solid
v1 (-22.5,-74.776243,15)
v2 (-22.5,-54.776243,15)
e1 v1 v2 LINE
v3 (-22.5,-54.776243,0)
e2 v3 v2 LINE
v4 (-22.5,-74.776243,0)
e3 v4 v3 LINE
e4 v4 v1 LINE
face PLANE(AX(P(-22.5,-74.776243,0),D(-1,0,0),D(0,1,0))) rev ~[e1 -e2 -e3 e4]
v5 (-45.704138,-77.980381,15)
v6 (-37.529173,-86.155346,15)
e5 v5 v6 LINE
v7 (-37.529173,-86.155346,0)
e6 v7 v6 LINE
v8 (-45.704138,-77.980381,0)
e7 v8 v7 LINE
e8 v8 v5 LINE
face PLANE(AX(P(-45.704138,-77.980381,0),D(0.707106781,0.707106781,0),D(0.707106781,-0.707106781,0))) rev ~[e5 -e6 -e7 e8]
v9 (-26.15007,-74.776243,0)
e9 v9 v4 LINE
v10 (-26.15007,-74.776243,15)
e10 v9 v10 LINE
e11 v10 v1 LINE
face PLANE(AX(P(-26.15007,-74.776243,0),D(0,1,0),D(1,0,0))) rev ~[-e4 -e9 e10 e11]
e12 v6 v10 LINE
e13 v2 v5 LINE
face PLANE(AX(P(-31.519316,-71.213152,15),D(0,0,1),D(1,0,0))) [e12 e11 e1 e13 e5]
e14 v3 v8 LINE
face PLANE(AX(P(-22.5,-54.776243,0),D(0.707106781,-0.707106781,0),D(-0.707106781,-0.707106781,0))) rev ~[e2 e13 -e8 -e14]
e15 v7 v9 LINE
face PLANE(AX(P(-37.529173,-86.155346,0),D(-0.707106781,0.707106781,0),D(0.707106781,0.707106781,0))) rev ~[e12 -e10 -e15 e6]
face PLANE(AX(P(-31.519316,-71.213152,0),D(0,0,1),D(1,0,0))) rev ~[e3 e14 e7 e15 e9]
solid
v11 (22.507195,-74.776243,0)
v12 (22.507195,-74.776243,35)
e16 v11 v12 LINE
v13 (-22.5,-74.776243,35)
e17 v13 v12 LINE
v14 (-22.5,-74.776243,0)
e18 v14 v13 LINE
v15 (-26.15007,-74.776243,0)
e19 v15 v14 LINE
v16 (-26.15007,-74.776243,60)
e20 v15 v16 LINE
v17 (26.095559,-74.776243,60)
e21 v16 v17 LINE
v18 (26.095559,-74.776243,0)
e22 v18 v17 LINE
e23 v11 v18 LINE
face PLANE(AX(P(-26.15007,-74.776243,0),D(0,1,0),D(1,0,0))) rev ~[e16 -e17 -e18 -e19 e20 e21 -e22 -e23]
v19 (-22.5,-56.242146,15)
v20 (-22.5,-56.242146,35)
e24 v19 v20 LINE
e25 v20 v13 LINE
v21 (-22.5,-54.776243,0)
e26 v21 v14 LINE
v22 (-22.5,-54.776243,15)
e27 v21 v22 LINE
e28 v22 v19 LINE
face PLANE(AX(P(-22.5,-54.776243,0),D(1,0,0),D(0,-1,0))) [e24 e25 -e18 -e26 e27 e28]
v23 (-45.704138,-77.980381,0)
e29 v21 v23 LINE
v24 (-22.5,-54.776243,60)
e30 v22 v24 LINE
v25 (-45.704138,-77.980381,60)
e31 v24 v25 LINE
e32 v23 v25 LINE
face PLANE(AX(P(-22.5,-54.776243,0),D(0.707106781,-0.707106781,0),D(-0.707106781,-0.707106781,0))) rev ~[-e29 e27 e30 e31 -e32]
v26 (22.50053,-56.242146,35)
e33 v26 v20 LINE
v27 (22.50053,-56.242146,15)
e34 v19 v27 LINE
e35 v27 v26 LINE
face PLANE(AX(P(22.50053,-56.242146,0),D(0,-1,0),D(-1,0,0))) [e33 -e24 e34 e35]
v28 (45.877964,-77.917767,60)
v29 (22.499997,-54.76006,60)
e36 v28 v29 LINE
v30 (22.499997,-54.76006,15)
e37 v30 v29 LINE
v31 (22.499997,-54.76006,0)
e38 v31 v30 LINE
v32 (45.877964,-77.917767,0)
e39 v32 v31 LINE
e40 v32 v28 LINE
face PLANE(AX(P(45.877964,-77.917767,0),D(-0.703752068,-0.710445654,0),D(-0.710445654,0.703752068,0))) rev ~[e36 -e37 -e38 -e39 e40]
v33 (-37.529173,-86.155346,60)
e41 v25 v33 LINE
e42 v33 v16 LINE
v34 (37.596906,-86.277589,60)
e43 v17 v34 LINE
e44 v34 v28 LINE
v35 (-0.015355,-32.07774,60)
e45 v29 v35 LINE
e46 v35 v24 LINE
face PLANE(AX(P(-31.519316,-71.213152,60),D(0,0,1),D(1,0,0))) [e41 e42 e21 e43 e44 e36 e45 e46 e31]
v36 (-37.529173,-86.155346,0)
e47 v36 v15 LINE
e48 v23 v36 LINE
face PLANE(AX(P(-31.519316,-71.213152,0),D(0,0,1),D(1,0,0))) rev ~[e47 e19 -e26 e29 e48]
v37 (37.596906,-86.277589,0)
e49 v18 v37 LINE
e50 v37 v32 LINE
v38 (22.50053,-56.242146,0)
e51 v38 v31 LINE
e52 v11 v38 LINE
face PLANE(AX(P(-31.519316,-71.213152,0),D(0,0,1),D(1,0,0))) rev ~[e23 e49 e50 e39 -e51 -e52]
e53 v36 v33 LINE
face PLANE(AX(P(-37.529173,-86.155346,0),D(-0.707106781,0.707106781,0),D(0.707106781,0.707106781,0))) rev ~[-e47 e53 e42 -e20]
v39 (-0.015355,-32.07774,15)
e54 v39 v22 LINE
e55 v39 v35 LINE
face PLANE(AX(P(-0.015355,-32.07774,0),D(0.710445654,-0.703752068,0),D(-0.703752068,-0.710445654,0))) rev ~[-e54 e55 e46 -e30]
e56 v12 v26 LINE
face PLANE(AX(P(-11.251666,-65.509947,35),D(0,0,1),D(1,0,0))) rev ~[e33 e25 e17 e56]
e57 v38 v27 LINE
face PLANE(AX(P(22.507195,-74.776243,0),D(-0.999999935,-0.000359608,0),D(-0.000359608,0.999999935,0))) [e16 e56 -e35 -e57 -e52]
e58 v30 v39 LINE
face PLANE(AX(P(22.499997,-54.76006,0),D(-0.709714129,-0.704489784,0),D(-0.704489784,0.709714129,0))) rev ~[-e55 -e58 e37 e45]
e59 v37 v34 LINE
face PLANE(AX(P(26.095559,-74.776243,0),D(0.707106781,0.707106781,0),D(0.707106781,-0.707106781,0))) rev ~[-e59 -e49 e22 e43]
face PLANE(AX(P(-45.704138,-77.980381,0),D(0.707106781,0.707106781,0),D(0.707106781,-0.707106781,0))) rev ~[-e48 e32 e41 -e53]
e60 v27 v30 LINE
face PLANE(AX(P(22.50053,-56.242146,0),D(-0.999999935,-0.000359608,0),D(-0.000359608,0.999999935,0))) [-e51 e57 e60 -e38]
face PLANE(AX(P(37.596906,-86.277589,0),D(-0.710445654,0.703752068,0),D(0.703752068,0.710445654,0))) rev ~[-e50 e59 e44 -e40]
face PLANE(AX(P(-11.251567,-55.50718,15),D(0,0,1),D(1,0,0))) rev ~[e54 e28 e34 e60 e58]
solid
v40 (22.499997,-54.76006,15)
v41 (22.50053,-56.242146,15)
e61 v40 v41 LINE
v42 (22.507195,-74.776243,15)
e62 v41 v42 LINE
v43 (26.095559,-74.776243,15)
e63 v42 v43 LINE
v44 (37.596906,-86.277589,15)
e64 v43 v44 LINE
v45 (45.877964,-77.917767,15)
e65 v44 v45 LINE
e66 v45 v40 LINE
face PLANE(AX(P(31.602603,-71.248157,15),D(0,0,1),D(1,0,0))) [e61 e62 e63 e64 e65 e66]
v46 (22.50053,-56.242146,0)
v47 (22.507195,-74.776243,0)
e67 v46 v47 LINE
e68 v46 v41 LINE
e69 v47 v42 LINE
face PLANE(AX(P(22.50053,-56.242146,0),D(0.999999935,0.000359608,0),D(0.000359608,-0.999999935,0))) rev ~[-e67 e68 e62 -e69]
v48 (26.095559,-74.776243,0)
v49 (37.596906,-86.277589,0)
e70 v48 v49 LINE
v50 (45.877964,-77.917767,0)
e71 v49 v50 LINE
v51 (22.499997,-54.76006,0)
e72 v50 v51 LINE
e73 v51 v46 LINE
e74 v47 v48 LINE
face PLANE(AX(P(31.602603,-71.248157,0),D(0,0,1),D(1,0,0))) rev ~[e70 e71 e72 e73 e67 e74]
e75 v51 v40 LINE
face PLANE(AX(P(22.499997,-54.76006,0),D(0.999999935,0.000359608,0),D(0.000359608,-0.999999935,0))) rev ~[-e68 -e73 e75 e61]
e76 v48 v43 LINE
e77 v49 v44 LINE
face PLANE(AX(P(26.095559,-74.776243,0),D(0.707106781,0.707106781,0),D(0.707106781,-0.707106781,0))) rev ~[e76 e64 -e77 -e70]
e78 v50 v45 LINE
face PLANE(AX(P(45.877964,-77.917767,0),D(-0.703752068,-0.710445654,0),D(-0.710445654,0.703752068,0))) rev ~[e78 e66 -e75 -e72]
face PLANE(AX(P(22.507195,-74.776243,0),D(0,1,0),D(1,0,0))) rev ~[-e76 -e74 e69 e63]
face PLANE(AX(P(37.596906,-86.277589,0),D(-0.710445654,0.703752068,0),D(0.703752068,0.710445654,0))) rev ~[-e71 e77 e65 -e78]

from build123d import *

# Parameters (mm, degrees)
F1_DEPTH = 15
F3_DEPTH = 60
F4_DEPTH = 35
F5_DEPTH = 15


# Not quite as in the source:
# - a feature of the source that left no trace in its solid (it failed there, or was rolled back) is left out


with BuildPart() as f1:
    # F0 (on Top) → F1 (new body)
    with BuildSketch(Plane.XY):
        Polygon((-45.7041380099, -77.9803808107), (-37.5291732437, -86.155345577), (-26.1500704675, -74.7762428008), (-22.5, -74.7762428008), (-22.5, -56.2421455979), (-22.5, -54.7762428008), align=None)
    extrude(amount=F1_DEPTH)


with BuildPart() as f1b:
    # F0 (on Top) → F1, piece 2 (new body)
    with BuildSketch(Plane.XY):
        Polygon((26.0955594839, -74.7762428008), (37.5969056221, -86.277588939), (45.8779636159, -77.9177674474), (22.4999970904, -54.7600604596), (22.5005300594, -56.2421455979), (22.5071950618, -74.7762428008), align=None)
    extrude(amount=F1_DEPTH)


with BuildPart() as f3:
    # F0 (on Top) → F3 (new body)
    with BuildSketch(Plane.XY):
        Polygon((-45.7041380099, -77.9803808107), (-37.5291732437, -86.155345577), (-26.1500704675, -74.7762428008), (-22.5, -74.7762428008), (-22.5, -56.2421455979), (-22.5, -54.7762428008), align=None)
        Polygon((-22.5, -56.2421455979), (-22.5, -74.7762428008), (0, -74.7762428008), (-0.0066650023, -56.2421455979), align=None)
        Polygon((0, -74.7762428008), (22.5071950618, -74.7762428008), (22.5005300594, -56.2421455979), (-0.0066650023, -56.2421455979), align=None)
        Polygon((26.0955594839, -74.7762428008), (37.5969056221, -86.277588939), (45.8779636159, -77.9177674474), (22.4999970904, -54.7600604596), (22.5005300594, -56.2421455979), (22.5071950618, -74.7762428008), align=None)
        Polygon((-0.0071950608, -54.7681542171), (-22.5, -54.7762428008), (-22.5, -56.2421455979), (-0.0066650023, -56.2421455979), align=None)
        Polygon((22.5005300594, -56.2421455979), (22.4999970904, -54.7600604596), (-0.0071950608, -54.7681542171), (-0.0066650023, -56.2421455979), align=None)
        Polygon((-0.0153547065, -32.0777396508), (-22.5, -54.7762428008), (-0.0071950608, -54.7681542171), align=None)
        Polygon((-0.0071950608, -54.7681542171), (22.4999970904, -54.7600604596), (-0.0153547065, -32.0777396508), align=None)
    extrude(amount=F3_DEPTH)

    # F0 (on Top) → F4 (cut)
    with BuildSketch(Plane.XY):
        Polygon((-22.5, -56.2421455979), (-22.5, -74.7762428008), (0, -74.7762428008), (-0.0066650023, -56.2421455979), align=None)
        Polygon((0, -74.7762428008), (22.5071950618, -74.7762428008), (22.5005300594, -56.2421455979), (-0.0066650023, -56.2421455979), align=None)
    extrude(amount=F4_DEPTH, mode=Mode.SUBTRACT)

    # F0 (on Top) → F5 (cut)
    with BuildSketch(Plane.XY):
        Polygon((-0.0071950608, -54.7681542171), (-22.5, -54.7762428008), (-22.5, -56.2421455979), (-0.0066650023, -56.2421455979), align=None)
        Polygon((22.5005300594, -56.2421455979), (22.4999970904, -54.7600604596), (-0.0071950608, -54.7681542171), (-0.0066650023, -56.2421455979), align=None)
        Polygon((-0.0071950608, -54.7681542171), (22.4999970904, -54.7600604596), (-0.0153547065, -32.0777396508), align=None)
        Polygon((-0.0153547065, -32.0777396508), (-22.5, -54.7762428008), (-0.0071950608, -54.7681542171), align=None)
    extrude(amount=F5_DEPTH, mode=Mode.SUBTRACT)


solid = Compound([f1.part, f1b.part, f3.part])
